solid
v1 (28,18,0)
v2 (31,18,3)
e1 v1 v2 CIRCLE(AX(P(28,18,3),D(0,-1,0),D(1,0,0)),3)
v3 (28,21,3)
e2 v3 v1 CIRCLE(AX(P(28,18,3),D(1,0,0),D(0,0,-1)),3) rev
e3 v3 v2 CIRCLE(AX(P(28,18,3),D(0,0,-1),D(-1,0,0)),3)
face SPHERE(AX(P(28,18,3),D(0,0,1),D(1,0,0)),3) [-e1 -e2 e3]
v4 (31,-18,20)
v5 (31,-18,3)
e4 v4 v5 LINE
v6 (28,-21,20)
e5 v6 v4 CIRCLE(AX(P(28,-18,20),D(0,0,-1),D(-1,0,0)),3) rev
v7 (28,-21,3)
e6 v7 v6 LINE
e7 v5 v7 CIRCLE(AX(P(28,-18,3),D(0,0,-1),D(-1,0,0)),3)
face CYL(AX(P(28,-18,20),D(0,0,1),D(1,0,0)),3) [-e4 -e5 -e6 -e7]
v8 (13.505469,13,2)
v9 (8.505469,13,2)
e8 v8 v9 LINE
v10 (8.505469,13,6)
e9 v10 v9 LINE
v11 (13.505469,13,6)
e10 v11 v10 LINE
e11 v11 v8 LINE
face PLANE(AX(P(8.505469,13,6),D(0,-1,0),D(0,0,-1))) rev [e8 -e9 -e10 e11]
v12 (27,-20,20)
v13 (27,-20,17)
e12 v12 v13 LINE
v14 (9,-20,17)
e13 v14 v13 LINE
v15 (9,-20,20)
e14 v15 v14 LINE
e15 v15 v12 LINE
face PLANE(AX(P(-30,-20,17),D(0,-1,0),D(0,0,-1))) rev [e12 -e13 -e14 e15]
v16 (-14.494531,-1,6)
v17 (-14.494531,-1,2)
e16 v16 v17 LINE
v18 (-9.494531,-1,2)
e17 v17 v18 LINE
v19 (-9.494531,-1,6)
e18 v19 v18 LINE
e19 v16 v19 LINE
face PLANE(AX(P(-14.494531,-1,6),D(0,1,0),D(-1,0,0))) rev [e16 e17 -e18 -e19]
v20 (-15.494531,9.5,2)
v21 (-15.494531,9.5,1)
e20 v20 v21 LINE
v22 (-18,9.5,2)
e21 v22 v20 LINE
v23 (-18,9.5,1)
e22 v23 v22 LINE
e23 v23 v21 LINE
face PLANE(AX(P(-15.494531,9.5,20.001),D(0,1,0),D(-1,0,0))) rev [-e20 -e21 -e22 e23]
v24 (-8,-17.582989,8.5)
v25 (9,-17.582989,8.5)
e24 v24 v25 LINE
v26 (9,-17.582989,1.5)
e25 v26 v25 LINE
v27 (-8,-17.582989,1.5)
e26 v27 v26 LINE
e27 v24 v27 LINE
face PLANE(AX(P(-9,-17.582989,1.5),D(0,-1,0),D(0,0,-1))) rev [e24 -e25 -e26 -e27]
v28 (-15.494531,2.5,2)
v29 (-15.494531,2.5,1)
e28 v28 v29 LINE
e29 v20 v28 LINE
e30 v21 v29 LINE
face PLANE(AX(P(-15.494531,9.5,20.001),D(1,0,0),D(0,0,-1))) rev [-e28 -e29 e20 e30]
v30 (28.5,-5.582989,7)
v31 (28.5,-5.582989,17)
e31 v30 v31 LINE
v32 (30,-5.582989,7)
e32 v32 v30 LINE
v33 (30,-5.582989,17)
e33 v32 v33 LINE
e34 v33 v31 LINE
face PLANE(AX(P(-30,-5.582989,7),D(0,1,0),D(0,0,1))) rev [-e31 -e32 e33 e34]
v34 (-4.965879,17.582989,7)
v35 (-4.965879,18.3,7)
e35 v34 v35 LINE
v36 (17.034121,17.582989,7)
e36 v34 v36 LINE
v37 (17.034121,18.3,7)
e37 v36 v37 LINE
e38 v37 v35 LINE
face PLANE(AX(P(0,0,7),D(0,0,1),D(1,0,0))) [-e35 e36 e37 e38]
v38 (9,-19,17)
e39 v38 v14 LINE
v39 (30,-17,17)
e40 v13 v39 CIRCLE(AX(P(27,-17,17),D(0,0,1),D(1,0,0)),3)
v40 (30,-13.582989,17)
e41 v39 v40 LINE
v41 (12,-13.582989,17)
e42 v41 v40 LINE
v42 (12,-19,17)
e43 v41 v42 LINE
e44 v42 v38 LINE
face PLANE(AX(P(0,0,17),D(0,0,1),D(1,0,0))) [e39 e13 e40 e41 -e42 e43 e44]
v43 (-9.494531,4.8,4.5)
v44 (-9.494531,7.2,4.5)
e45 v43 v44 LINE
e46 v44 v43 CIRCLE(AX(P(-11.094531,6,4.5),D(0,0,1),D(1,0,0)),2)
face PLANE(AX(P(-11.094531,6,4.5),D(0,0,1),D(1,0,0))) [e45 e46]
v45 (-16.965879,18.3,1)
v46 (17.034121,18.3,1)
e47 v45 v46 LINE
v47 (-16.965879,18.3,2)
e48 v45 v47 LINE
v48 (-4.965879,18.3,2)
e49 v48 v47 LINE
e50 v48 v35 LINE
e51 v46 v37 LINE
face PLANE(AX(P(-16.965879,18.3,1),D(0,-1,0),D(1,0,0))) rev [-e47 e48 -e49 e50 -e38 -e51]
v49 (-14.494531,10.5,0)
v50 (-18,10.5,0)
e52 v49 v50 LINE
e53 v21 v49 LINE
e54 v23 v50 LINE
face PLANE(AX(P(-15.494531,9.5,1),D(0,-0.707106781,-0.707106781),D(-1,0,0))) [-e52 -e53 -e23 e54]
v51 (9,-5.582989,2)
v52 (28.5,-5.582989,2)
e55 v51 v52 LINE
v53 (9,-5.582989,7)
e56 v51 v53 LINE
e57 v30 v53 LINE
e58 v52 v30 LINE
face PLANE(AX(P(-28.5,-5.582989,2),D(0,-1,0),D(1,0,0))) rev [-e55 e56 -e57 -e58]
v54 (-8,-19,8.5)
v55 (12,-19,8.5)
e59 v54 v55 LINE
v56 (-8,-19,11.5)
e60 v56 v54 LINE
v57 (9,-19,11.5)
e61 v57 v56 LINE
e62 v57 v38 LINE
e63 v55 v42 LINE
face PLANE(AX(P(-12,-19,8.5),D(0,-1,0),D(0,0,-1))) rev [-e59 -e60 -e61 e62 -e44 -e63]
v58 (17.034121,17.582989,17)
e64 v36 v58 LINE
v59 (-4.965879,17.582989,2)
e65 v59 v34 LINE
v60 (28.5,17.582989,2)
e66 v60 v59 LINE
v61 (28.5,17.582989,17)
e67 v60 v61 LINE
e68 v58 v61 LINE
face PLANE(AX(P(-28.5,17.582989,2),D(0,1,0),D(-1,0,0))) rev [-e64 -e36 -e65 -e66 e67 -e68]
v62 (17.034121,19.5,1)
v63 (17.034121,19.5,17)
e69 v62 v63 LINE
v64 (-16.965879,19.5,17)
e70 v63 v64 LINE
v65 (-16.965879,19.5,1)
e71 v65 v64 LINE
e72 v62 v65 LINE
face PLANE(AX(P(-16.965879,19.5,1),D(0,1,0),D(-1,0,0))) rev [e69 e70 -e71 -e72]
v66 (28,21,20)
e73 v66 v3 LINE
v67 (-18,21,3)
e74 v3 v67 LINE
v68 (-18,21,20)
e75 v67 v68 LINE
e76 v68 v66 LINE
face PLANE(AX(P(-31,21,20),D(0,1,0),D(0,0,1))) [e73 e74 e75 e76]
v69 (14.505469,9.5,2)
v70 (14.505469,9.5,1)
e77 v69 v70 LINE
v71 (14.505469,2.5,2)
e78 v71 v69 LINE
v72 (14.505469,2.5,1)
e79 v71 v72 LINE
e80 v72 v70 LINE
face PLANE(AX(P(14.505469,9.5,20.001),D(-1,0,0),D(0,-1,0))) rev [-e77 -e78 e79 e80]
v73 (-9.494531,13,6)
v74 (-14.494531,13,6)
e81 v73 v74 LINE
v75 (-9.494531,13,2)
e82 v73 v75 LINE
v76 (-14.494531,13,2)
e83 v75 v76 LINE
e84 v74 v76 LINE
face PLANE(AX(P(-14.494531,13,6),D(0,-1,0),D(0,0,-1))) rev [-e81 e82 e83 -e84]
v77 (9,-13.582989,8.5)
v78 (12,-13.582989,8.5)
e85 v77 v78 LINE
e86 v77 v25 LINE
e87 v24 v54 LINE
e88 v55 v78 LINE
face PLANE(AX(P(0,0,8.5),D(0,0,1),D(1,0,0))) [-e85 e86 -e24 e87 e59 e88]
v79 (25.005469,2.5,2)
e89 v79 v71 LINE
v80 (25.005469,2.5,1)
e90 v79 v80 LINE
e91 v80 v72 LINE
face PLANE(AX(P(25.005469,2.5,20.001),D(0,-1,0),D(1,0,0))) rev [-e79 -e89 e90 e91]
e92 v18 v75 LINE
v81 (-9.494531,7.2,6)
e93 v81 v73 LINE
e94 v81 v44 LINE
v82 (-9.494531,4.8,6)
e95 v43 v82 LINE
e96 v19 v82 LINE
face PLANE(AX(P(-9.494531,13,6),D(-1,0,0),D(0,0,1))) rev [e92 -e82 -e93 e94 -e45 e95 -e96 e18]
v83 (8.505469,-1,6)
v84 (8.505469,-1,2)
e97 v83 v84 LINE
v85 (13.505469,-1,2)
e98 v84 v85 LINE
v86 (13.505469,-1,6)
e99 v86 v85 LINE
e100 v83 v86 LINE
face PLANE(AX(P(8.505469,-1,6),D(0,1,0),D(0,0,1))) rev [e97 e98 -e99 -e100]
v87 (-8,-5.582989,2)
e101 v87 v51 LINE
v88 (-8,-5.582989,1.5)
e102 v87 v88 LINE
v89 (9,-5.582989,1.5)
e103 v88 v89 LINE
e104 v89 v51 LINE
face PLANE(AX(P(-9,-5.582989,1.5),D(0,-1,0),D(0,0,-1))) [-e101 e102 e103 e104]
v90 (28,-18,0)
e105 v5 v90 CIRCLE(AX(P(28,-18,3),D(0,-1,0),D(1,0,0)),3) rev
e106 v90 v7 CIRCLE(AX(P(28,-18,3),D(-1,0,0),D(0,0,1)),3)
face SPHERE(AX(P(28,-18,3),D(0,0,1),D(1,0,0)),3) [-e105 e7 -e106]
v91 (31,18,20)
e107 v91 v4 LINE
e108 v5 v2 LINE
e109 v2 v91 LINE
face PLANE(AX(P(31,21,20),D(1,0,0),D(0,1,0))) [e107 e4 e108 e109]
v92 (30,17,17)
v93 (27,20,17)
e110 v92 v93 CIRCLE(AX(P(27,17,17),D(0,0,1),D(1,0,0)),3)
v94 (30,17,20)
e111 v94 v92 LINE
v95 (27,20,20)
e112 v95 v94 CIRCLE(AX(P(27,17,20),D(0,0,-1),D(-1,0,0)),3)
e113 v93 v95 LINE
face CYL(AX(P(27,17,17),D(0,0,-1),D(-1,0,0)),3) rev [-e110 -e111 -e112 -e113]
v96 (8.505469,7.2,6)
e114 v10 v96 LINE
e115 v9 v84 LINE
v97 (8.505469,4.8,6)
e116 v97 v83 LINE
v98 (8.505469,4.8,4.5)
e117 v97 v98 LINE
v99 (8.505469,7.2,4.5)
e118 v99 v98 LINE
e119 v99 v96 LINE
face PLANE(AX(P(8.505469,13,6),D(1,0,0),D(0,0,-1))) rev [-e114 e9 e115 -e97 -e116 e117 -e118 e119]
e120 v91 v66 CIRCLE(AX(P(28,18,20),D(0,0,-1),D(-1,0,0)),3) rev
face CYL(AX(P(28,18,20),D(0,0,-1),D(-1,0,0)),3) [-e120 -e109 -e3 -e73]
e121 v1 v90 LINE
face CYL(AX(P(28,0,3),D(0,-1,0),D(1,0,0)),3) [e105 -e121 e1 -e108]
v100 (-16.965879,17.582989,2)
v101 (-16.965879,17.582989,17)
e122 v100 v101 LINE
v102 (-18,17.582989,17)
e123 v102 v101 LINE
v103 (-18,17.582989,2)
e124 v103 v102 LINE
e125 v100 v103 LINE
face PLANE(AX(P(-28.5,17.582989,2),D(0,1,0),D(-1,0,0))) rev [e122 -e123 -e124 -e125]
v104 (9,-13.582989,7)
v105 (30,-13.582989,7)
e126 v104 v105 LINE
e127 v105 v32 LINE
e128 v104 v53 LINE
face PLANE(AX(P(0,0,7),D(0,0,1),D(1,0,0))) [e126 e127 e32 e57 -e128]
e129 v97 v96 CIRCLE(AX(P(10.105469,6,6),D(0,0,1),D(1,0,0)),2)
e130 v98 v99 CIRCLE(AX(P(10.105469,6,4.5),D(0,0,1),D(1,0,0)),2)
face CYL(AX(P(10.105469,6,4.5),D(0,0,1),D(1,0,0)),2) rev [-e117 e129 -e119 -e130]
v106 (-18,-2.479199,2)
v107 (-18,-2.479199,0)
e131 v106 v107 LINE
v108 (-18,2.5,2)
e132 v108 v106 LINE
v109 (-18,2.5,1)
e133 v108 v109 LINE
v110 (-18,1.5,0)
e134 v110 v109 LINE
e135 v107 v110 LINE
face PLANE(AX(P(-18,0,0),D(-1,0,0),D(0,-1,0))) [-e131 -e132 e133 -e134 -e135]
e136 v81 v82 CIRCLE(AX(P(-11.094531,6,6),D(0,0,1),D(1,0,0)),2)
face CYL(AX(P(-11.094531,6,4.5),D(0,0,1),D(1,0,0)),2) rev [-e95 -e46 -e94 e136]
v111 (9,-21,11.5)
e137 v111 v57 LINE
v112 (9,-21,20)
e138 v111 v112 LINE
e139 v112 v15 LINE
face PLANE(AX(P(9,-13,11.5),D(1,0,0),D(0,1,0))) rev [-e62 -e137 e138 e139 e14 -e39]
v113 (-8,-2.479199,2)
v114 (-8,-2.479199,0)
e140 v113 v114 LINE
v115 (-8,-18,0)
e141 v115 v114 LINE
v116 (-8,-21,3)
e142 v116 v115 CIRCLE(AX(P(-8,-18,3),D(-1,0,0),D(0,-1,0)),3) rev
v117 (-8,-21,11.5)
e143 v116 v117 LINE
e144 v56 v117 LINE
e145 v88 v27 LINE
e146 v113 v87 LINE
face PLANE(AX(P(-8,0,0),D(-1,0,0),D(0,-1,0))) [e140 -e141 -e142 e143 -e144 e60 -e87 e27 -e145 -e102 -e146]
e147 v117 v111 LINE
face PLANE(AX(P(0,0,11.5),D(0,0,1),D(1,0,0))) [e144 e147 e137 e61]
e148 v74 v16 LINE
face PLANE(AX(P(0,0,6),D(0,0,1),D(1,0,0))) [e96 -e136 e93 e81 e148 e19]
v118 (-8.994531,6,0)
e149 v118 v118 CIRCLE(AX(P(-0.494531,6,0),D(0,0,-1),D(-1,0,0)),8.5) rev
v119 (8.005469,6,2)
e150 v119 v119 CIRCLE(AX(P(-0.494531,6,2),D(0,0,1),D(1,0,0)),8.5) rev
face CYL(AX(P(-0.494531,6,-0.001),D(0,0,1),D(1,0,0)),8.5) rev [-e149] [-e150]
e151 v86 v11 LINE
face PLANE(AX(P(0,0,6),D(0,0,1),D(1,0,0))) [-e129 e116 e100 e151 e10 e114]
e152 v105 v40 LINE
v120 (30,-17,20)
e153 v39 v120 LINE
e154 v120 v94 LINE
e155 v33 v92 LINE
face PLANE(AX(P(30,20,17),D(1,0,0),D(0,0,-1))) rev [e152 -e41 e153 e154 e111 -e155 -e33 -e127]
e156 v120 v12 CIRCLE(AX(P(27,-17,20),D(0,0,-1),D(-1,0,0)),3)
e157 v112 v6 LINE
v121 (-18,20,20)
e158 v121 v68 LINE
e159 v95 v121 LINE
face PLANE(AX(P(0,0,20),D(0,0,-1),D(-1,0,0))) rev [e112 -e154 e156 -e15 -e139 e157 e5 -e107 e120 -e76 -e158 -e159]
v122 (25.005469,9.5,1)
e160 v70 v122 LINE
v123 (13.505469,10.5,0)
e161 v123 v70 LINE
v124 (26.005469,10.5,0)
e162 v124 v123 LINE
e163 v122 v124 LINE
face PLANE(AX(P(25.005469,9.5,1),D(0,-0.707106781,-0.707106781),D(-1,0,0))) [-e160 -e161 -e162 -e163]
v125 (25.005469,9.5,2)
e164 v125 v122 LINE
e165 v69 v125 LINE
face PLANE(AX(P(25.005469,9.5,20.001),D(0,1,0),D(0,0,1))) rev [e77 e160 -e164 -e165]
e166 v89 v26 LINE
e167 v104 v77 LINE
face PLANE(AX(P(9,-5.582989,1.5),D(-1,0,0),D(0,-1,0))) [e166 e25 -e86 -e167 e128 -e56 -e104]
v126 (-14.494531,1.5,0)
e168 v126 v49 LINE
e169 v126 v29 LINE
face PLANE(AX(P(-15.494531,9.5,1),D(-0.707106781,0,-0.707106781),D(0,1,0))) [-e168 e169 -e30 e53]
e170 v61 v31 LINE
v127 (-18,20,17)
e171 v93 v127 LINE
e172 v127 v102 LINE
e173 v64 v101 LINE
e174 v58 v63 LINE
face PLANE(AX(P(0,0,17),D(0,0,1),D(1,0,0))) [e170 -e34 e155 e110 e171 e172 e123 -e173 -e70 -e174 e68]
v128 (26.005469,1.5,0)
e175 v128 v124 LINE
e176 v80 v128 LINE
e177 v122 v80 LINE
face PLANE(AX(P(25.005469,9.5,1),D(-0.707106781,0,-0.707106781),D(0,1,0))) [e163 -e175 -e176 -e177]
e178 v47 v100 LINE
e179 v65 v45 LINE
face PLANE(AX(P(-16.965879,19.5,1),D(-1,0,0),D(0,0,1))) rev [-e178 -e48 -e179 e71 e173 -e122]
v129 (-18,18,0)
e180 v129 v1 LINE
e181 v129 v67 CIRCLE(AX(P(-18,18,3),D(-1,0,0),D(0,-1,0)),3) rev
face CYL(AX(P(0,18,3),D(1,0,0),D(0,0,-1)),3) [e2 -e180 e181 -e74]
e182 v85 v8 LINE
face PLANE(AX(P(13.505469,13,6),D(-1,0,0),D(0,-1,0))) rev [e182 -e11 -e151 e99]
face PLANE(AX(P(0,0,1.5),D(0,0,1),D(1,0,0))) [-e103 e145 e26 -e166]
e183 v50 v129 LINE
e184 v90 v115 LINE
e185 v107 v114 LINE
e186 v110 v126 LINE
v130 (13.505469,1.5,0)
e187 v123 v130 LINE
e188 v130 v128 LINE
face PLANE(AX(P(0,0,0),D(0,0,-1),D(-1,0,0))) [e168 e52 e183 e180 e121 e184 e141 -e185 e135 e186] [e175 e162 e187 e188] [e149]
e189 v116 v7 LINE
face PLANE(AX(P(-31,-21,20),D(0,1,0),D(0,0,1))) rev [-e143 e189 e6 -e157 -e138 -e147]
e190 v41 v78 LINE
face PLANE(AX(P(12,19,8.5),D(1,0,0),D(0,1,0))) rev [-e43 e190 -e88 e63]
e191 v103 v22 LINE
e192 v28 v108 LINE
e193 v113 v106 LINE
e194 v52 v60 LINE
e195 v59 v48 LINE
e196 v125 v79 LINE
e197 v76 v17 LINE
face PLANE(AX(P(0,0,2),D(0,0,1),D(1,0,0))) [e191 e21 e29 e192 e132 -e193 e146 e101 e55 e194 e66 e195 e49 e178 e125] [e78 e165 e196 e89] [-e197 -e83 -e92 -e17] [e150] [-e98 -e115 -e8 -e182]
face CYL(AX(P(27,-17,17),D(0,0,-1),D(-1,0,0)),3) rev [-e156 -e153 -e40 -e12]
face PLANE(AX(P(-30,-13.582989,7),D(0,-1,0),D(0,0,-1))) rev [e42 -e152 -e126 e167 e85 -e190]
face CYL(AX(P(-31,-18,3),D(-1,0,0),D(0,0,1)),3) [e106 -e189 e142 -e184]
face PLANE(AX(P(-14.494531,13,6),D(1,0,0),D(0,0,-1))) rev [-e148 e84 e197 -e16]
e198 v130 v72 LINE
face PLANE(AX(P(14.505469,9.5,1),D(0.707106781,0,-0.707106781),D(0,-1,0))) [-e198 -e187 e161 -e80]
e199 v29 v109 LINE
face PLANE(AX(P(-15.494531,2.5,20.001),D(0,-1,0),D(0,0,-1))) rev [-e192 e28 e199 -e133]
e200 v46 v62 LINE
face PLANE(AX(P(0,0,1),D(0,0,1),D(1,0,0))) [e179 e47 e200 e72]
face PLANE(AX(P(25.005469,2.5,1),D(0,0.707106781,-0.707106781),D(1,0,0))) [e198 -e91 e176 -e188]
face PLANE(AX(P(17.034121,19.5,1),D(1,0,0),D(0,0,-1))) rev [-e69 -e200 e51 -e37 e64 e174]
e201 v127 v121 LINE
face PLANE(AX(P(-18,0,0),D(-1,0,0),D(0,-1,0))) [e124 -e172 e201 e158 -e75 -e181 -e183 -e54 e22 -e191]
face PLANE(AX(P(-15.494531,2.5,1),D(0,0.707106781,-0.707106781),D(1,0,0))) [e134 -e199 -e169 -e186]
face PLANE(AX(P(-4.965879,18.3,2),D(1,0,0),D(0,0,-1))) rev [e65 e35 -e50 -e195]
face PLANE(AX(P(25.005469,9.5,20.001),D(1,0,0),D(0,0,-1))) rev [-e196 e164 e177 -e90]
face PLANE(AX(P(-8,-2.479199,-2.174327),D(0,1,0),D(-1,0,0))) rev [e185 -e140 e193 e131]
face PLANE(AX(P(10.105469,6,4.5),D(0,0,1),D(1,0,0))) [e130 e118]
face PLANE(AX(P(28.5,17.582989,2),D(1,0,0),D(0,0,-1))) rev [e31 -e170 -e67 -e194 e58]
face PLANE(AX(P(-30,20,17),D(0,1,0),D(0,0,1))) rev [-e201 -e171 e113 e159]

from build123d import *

# Parameters (mm, degrees)
SKETCH1_W           = 62
SKETCH1_H           = 42
BOSS_EXTRUDE1_DEPTH = 20
SKETCH8_W           = 24
SKETCH8_H           = 38
CUT_EXTRUDE1_DEPTH  = 11.5
CUT_EXTRUDE2_REACH  = 41.17
SKETCH9_R           = 8.5
SKETCH10_W          = 57
SKETCH10_H          = 23.165977038
CUT_EXTRUDE3_DEPTH  = 18
FILLET1_R           = 3
FILLET2_R           = 3
SKETCH11_W          = 18
SKETCH11_H          = 8
CUT_EXTRUDE4_DEPTH  = 8.5
SKETCH12_W          = 60
SKETCH12_H          = 40
CUT_EXTRUDE5_DEPTH  = 3
FILLET3_R           = 3
SKETCH13_W          = 18
SKETCH13_H          = 12
CUT_EXTRUDE6_DEPTH  = 7
CUT_EXTRUDE10_REACH = 44.45
SKETCH18_W          = 10.5
SKETCH18_H          = 7
SKETCH22_W          = 5
SKETCH22_H          = 14
BOSS_EXTRUDE2_DEPTH = 4
SKETCH16_R          = 2
CUT_EXTRUDE9_DEPTH  = 1.5
CHAMFER1_SIZE       = 1
SKETCH19_W          = 34
SKETCH19_H          = 1.2
CUT_EXTRUDE11_DEPTH = 16
SKETCH20_W          = 34
SKETCH20_H          = 0.717011481
CUT_EXTRUDE12_DEPTH = 10
SKETCH21_W          = 60
SKETCH21_H          = 8
CUT_EXTRUDE13_DEPTH = 10
SKETCH14_W          = 24.0014575
SKETCH14_H          = 44.120551562
CUT_EXTRUDE7_DEPTH  = 13
SKETCH15_W          = 25.642620831
SKETCH15_H          = 19.236744125
CUT_EXTRUDE8_DEPTH  = 10
SKETCH23_W          = 12
SKETCH23_H          = 0.717011481
CUT_EXTRUDE14_DEPTH = 5


with BuildPart() as part:
    # Sketch1 → Boss-Extrude1 (new body)
    with BuildSketch(Plane.XY):
        Rectangle(SKETCH1_W, SKETCH1_H)
    extrude(amount=BOSS_EXTRUDE1_DEPTH)

    # Sketch8 → Cut-Extrude1 (cut)
    with BuildSketch(Plane.XY.offset(20)):
        Rectangle(SKETCH8_W, SKETCH8_H)
    extrude(amount=-CUT_EXTRUDE1_DEPTH, mode=Mode.SUBTRACT)

    # Sketch9 → Cut-Extrude2 (cut, up to next)
    with BuildSketch(Plane.XY.offset(8.5), mode=Mode.PRIVATE) as cut_extrude2_sk1:
        with Locations((-0.494531145, 6)):
            Circle(SKETCH9_R)
    cut_extrude2_tool1 = extrude(cut_extrude2_sk1.sketch, amount=-CUT_EXTRUDE2_REACH, mode=Mode.PRIVATE) & part.part
    add(cut_extrude2_tool1.solids().sort_by_distance((-0.494531, 6, 8.5))[0], mode=Mode.SUBTRACT)

    # Sketch10 → Cut-Extrude3 (cut)
    with BuildSketch(Plane.XY.offset(20)):
        with Locations((0, 6)):
            Rectangle(SKETCH10_W, SKETCH10_H)
    extrude(amount=-CUT_EXTRUDE3_DEPTH, mode=Mode.SUBTRACT)

    # Fillet1
    fillet1_edges = [part.edges().sort_by_distance(p)[0] for p in [
        (-31, 0, 0),
        (0, -21, 0),
        (31, 0, 0),
        (0, 21, 0),
    ]]
    fillet(fillet1_edges, radius=FILLET1_R)

    # Fillet2
    # the kernel refuses this fillet: 3 mm, written as the material it takes off along each edge
    with BuildSketch(Plane(origin=(-28, 18, 3), x_dir=(-1, 0, 0), z_dir=(0, 1, 0))) as fillet2_piece_1_section:
        Polygon((0, 0), (FILLET2_R, 0), (FILLET2_R, -FILLET2_R), (0, -FILLET2_R), align=None)
    fillet2_piece_1 = extrude(amount=FILLET2_R, mode=Mode.PRIVATE)
    fillet2_piece_1 = fillet2_piece_1 - Plane(origin=(-28, 18, 3), x_dir=(0.7071067811865475, 0, 0.7071067811865475), z_dir=(0, 1, 0)) * Sphere(FILLET2_R, mode=Mode.PRIVATE)
    add(fillet2_piece_1, mode=Mode.SUBTRACT)
    with BuildSketch(Plane(origin=(-28, -18, 3), x_dir=(0, -1, 0), z_dir=(-1, 0, 0))) as fillet2_piece_2_section:
        Polygon((0, 0), (FILLET2_R, 0), (FILLET2_R, -FILLET2_R), (0, -FILLET2_R), align=None)
    fillet2_piece_2 = extrude(amount=FILLET2_R, mode=Mode.PRIVATE)
    fillet2_piece_2 = fillet2_piece_2 - Plane(origin=(-28, -18, 3), x_dir=(0, 0.7071067811865475, 0.7071067811865475), z_dir=(-1, 0, 0)) * Sphere(FILLET2_R, mode=Mode.PRIVATE)
    add(fillet2_piece_2, mode=Mode.SUBTRACT)
    with BuildSketch(Plane(origin=(28, 18, 3), x_dir=(1, 0, 0), z_dir=(0, 1, 0))) as fillet2_piece_3_section:
        Polygon((0, 0), (FILLET2_R, 0), (FILLET2_R, FILLET2_R), (0, FILLET2_R), align=None)
    fillet2_piece_3 = extrude(amount=FILLET2_R, mode=Mode.PRIVATE)
    fillet2_piece_3 = fillet2_piece_3 - Plane(origin=(28, 18, 3), x_dir=(-0.7071067811865475, 0, 0.7071067811865475), z_dir=(0, 1, 0)) * Sphere(FILLET2_R, mode=Mode.PRIVATE)
    add(fillet2_piece_3, mode=Mode.SUBTRACT)
    with BuildSketch(Plane(origin=(28, -18, 3), x_dir=(0, -1, 0), z_dir=(1, 0, 0))) as fillet2_piece_4_section:
        Polygon((0, 0), (FILLET2_R, 0), (FILLET2_R, FILLET2_R), (0, FILLET2_R), align=None)
    fillet2_piece_4 = extrude(amount=FILLET2_R, mode=Mode.PRIVATE)
    fillet2_piece_4 = fillet2_piece_4 - Plane(origin=(28, -18, 3), x_dir=(0, 0.7071067811865475, 0.7071067811865475), z_dir=(1, 0, 0)) * Sphere(FILLET2_R, mode=Mode.PRIVATE)
    add(fillet2_piece_4, mode=Mode.SUBTRACT)
    with BuildSketch(Plane(origin=(-31, 21, 3), x_dir=(1, 0, 0), z_dir=(0, 0, 1)), Plane(origin=(-31, -21, 3), x_dir=(0, 1, 0), z_dir=(0, 0, 1))) as fillet2_piece_5:
        with BuildLine():
            CenterArc((FILLET2_R, -FILLET2_R), FILLET2_R, 90, 90)
            Line((0, -FILLET2_R), (0, 0))
            Line((0, 0), (FILLET2_R, 0))
        make_face()
    extrude(amount=24.5, mode=Mode.SUBTRACT)
    with BuildSketch(Plane(origin=(31, -21, 3), x_dir=(0, 1, 0), z_dir=(0, 0, 1)), Plane(origin=(31, 21, 3), x_dir=(-1, 0, 0), z_dir=(0, 0, 1))) as fillet2_piece_6:
        with BuildLine():
            CenterArc((FILLET2_R, FILLET2_R), FILLET2_R, 180, 90)
            Line((0, FILLET2_R), (0, 0))
            Line((0, 0), (FILLET2_R, 0))
        make_face()
    extrude(amount=24.5, mode=Mode.SUBTRACT)

    # Sketch11 → Cut-Extrude4 (cut)
    with BuildSketch(Plane.XY.offset(20)):
        with Locations((0, -17)):
            Rectangle(SKETCH11_W, SKETCH11_H)
    extrude(amount=-CUT_EXTRUDE4_DEPTH, mode=Mode.SUBTRACT)

    # Sketch12 → Cut-Extrude5 (cut)
    with BuildSketch(Plane.XY.offset(20)):
        Rectangle(SKETCH12_W, SKETCH12_H)
    extrude(amount=-CUT_EXTRUDE5_DEPTH, mode=Mode.SUBTRACT)

    # Fillet3
    fillet3_edges = [part.edges().sort_by_distance(p)[0] for p in [
        (30, -20, 18.5),
        (-30, -20, 18.5),
        (-30, 20, 18.5),
        (30, 20, 18.5),
    ]]
    fillet(fillet3_edges, radius=FILLET3_R)

    # Sketch13 → Cut-Extrude6 (cut)
    with BuildSketch(Plane.XY.offset(8.5)):
        with Locations((0, -11.582988519)):
            Rectangle(SKETCH13_W, SKETCH13_H)
    extrude(amount=-CUT_EXTRUDE6_DEPTH, mode=Mode.SUBTRACT)

    # Sketch18 → Cut-Extrude10 (cut, up to next)
    with BuildSketch(Plane(origin=(0, 0, 0), x_dir=(-1, 0, 0), z_dir=(0, 0, -1)), mode=Mode.PRIVATE) as cut_extrude10_sk1:
        with Locations((-19.755468855, 6)):
            Rectangle(SKETCH18_W, SKETCH18_H)
    cut_extrude10_tool1 = extrude(cut_extrude10_sk1.sketch, amount=-CUT_EXTRUDE10_REACH, mode=Mode.PRIVATE) & part.part
    # Sketch18 → Cut-Extrude10 (cut, up to next)
    with BuildSketch(Plane(origin=(0, 0, 0), x_dir=(-1, 0, 0), z_dir=(0, 0, -1)), mode=Mode.PRIVATE) as cut_extrude10_sk2:
        with Locations((20.744531145, 6)):
            Rectangle(SKETCH18_W, SKETCH18_H)
    cut_extrude10_tool2 = extrude(cut_extrude10_sk2.sketch, amount=-CUT_EXTRUDE10_REACH, mode=Mode.PRIVATE) & part.part
    add(cut_extrude10_tool1.solids().sort_by_distance((19.755469, 6, 0))[0], mode=Mode.SUBTRACT)
    add(cut_extrude10_tool2.solids().sort_by_distance((-20.744531, 6, 0))[0], mode=Mode.SUBTRACT)

    # Sketch22 → Boss-Extrude2 (add)
    with BuildSketch(Plane.XY.offset(2)):
        with Locations((-11.994531145, 6)):
            Rectangle(SKETCH22_W, SKETCH22_H)
        with Locations((11.005468855, 6)):
            Rectangle(SKETCH22_W, SKETCH22_H)
    extrude(amount=BOSS_EXTRUDE2_DEPTH)

    # Sketch16 → Cut-Extrude9 (cut)
    with BuildSketch(Plane.XY.offset(6)):
        with Locations((-11.094531145, 6)):
            Circle(SKETCH16_R)
        with Locations((10.105468855, 6)):
            Circle(SKETCH16_R)
    extrude(amount=-CUT_EXTRUDE9_DEPTH, mode=Mode.SUBTRACT)

    # Chamfer1
    chamfer1_edges = [part.edges().sort_by_distance(p)[0] for p in [
        (25.005468855, 6, 0),
        (19.755468855, 2.5, 0),
        (14.505468855, 6, 0),
        (19.755468855, 9.5, 0),
        (-15.494531145, 6, 0),
        (-20.744531145, 2.5, 0),
        (-25.994531145, 6, 0),
        (-20.744531145, 9.5, 0),
    ]]
    chamfer(chamfer1_edges, length=CHAMFER1_SIZE)

    # Sketch19 → Cut-Extrude11 (cut)
    with BuildSketch(Plane.XY.offset(17)):
        with Locations((0.034121004, 18.9)):
            Rectangle(SKETCH19_W, SKETCH19_H)
    extrude(amount=-CUT_EXTRUDE11_DEPTH, mode=Mode.SUBTRACT)

    # Sketch20 → Cut-Extrude12 (cut)
    with BuildSketch(Plane.XY.offset(17)):
        with Locations((0.034121004, 17.94149426)):
            Rectangle(SKETCH20_W, SKETCH20_H)
    extrude(amount=-CUT_EXTRUDE12_DEPTH, mode=Mode.SUBTRACT)

    # Sketch21 → Cut-Extrude13 (cut)
    with BuildSketch(Plane.XY.offset(17)):
        with Locations((0, -9.582988519)):
            Rectangle(SKETCH21_W, SKETCH21_H)
    extrude(amount=-CUT_EXTRUDE13_DEPTH, mode=Mode.SUBTRACT)

    # Sketch14 → Cut-Extrude7 (cut)
    with BuildSketch(Plane.ZY.offset(31)):
        with Locations((10.285512598, -0.436155296)):
            Rectangle(SKETCH14_W, SKETCH14_H)
    extrude(amount=-CUT_EXTRUDE7_DEPTH, mode=Mode.SUBTRACT)

    # Sketch15 → Cut-Extrude8 (cut)
    with BuildSketch(Plane.ZY.offset(18)):
        with Locations((10.646983425, -12.09757059)):
            Rectangle(SKETCH15_W, SKETCH15_H)
    extrude(amount=-CUT_EXTRUDE8_DEPTH, mode=Mode.SUBTRACT)

    # Sketch23 → Cut-Extrude14 (cut)
    with BuildSketch(Plane.XY.offset(7)):
        with Locations((-10.965878996, 17.94149426)):
            Rectangle(SKETCH23_W, SKETCH23_H)
    extrude(amount=-CUT_EXTRUDE14_DEPTH, mode=Mode.SUBTRACT)


solid = part.part
